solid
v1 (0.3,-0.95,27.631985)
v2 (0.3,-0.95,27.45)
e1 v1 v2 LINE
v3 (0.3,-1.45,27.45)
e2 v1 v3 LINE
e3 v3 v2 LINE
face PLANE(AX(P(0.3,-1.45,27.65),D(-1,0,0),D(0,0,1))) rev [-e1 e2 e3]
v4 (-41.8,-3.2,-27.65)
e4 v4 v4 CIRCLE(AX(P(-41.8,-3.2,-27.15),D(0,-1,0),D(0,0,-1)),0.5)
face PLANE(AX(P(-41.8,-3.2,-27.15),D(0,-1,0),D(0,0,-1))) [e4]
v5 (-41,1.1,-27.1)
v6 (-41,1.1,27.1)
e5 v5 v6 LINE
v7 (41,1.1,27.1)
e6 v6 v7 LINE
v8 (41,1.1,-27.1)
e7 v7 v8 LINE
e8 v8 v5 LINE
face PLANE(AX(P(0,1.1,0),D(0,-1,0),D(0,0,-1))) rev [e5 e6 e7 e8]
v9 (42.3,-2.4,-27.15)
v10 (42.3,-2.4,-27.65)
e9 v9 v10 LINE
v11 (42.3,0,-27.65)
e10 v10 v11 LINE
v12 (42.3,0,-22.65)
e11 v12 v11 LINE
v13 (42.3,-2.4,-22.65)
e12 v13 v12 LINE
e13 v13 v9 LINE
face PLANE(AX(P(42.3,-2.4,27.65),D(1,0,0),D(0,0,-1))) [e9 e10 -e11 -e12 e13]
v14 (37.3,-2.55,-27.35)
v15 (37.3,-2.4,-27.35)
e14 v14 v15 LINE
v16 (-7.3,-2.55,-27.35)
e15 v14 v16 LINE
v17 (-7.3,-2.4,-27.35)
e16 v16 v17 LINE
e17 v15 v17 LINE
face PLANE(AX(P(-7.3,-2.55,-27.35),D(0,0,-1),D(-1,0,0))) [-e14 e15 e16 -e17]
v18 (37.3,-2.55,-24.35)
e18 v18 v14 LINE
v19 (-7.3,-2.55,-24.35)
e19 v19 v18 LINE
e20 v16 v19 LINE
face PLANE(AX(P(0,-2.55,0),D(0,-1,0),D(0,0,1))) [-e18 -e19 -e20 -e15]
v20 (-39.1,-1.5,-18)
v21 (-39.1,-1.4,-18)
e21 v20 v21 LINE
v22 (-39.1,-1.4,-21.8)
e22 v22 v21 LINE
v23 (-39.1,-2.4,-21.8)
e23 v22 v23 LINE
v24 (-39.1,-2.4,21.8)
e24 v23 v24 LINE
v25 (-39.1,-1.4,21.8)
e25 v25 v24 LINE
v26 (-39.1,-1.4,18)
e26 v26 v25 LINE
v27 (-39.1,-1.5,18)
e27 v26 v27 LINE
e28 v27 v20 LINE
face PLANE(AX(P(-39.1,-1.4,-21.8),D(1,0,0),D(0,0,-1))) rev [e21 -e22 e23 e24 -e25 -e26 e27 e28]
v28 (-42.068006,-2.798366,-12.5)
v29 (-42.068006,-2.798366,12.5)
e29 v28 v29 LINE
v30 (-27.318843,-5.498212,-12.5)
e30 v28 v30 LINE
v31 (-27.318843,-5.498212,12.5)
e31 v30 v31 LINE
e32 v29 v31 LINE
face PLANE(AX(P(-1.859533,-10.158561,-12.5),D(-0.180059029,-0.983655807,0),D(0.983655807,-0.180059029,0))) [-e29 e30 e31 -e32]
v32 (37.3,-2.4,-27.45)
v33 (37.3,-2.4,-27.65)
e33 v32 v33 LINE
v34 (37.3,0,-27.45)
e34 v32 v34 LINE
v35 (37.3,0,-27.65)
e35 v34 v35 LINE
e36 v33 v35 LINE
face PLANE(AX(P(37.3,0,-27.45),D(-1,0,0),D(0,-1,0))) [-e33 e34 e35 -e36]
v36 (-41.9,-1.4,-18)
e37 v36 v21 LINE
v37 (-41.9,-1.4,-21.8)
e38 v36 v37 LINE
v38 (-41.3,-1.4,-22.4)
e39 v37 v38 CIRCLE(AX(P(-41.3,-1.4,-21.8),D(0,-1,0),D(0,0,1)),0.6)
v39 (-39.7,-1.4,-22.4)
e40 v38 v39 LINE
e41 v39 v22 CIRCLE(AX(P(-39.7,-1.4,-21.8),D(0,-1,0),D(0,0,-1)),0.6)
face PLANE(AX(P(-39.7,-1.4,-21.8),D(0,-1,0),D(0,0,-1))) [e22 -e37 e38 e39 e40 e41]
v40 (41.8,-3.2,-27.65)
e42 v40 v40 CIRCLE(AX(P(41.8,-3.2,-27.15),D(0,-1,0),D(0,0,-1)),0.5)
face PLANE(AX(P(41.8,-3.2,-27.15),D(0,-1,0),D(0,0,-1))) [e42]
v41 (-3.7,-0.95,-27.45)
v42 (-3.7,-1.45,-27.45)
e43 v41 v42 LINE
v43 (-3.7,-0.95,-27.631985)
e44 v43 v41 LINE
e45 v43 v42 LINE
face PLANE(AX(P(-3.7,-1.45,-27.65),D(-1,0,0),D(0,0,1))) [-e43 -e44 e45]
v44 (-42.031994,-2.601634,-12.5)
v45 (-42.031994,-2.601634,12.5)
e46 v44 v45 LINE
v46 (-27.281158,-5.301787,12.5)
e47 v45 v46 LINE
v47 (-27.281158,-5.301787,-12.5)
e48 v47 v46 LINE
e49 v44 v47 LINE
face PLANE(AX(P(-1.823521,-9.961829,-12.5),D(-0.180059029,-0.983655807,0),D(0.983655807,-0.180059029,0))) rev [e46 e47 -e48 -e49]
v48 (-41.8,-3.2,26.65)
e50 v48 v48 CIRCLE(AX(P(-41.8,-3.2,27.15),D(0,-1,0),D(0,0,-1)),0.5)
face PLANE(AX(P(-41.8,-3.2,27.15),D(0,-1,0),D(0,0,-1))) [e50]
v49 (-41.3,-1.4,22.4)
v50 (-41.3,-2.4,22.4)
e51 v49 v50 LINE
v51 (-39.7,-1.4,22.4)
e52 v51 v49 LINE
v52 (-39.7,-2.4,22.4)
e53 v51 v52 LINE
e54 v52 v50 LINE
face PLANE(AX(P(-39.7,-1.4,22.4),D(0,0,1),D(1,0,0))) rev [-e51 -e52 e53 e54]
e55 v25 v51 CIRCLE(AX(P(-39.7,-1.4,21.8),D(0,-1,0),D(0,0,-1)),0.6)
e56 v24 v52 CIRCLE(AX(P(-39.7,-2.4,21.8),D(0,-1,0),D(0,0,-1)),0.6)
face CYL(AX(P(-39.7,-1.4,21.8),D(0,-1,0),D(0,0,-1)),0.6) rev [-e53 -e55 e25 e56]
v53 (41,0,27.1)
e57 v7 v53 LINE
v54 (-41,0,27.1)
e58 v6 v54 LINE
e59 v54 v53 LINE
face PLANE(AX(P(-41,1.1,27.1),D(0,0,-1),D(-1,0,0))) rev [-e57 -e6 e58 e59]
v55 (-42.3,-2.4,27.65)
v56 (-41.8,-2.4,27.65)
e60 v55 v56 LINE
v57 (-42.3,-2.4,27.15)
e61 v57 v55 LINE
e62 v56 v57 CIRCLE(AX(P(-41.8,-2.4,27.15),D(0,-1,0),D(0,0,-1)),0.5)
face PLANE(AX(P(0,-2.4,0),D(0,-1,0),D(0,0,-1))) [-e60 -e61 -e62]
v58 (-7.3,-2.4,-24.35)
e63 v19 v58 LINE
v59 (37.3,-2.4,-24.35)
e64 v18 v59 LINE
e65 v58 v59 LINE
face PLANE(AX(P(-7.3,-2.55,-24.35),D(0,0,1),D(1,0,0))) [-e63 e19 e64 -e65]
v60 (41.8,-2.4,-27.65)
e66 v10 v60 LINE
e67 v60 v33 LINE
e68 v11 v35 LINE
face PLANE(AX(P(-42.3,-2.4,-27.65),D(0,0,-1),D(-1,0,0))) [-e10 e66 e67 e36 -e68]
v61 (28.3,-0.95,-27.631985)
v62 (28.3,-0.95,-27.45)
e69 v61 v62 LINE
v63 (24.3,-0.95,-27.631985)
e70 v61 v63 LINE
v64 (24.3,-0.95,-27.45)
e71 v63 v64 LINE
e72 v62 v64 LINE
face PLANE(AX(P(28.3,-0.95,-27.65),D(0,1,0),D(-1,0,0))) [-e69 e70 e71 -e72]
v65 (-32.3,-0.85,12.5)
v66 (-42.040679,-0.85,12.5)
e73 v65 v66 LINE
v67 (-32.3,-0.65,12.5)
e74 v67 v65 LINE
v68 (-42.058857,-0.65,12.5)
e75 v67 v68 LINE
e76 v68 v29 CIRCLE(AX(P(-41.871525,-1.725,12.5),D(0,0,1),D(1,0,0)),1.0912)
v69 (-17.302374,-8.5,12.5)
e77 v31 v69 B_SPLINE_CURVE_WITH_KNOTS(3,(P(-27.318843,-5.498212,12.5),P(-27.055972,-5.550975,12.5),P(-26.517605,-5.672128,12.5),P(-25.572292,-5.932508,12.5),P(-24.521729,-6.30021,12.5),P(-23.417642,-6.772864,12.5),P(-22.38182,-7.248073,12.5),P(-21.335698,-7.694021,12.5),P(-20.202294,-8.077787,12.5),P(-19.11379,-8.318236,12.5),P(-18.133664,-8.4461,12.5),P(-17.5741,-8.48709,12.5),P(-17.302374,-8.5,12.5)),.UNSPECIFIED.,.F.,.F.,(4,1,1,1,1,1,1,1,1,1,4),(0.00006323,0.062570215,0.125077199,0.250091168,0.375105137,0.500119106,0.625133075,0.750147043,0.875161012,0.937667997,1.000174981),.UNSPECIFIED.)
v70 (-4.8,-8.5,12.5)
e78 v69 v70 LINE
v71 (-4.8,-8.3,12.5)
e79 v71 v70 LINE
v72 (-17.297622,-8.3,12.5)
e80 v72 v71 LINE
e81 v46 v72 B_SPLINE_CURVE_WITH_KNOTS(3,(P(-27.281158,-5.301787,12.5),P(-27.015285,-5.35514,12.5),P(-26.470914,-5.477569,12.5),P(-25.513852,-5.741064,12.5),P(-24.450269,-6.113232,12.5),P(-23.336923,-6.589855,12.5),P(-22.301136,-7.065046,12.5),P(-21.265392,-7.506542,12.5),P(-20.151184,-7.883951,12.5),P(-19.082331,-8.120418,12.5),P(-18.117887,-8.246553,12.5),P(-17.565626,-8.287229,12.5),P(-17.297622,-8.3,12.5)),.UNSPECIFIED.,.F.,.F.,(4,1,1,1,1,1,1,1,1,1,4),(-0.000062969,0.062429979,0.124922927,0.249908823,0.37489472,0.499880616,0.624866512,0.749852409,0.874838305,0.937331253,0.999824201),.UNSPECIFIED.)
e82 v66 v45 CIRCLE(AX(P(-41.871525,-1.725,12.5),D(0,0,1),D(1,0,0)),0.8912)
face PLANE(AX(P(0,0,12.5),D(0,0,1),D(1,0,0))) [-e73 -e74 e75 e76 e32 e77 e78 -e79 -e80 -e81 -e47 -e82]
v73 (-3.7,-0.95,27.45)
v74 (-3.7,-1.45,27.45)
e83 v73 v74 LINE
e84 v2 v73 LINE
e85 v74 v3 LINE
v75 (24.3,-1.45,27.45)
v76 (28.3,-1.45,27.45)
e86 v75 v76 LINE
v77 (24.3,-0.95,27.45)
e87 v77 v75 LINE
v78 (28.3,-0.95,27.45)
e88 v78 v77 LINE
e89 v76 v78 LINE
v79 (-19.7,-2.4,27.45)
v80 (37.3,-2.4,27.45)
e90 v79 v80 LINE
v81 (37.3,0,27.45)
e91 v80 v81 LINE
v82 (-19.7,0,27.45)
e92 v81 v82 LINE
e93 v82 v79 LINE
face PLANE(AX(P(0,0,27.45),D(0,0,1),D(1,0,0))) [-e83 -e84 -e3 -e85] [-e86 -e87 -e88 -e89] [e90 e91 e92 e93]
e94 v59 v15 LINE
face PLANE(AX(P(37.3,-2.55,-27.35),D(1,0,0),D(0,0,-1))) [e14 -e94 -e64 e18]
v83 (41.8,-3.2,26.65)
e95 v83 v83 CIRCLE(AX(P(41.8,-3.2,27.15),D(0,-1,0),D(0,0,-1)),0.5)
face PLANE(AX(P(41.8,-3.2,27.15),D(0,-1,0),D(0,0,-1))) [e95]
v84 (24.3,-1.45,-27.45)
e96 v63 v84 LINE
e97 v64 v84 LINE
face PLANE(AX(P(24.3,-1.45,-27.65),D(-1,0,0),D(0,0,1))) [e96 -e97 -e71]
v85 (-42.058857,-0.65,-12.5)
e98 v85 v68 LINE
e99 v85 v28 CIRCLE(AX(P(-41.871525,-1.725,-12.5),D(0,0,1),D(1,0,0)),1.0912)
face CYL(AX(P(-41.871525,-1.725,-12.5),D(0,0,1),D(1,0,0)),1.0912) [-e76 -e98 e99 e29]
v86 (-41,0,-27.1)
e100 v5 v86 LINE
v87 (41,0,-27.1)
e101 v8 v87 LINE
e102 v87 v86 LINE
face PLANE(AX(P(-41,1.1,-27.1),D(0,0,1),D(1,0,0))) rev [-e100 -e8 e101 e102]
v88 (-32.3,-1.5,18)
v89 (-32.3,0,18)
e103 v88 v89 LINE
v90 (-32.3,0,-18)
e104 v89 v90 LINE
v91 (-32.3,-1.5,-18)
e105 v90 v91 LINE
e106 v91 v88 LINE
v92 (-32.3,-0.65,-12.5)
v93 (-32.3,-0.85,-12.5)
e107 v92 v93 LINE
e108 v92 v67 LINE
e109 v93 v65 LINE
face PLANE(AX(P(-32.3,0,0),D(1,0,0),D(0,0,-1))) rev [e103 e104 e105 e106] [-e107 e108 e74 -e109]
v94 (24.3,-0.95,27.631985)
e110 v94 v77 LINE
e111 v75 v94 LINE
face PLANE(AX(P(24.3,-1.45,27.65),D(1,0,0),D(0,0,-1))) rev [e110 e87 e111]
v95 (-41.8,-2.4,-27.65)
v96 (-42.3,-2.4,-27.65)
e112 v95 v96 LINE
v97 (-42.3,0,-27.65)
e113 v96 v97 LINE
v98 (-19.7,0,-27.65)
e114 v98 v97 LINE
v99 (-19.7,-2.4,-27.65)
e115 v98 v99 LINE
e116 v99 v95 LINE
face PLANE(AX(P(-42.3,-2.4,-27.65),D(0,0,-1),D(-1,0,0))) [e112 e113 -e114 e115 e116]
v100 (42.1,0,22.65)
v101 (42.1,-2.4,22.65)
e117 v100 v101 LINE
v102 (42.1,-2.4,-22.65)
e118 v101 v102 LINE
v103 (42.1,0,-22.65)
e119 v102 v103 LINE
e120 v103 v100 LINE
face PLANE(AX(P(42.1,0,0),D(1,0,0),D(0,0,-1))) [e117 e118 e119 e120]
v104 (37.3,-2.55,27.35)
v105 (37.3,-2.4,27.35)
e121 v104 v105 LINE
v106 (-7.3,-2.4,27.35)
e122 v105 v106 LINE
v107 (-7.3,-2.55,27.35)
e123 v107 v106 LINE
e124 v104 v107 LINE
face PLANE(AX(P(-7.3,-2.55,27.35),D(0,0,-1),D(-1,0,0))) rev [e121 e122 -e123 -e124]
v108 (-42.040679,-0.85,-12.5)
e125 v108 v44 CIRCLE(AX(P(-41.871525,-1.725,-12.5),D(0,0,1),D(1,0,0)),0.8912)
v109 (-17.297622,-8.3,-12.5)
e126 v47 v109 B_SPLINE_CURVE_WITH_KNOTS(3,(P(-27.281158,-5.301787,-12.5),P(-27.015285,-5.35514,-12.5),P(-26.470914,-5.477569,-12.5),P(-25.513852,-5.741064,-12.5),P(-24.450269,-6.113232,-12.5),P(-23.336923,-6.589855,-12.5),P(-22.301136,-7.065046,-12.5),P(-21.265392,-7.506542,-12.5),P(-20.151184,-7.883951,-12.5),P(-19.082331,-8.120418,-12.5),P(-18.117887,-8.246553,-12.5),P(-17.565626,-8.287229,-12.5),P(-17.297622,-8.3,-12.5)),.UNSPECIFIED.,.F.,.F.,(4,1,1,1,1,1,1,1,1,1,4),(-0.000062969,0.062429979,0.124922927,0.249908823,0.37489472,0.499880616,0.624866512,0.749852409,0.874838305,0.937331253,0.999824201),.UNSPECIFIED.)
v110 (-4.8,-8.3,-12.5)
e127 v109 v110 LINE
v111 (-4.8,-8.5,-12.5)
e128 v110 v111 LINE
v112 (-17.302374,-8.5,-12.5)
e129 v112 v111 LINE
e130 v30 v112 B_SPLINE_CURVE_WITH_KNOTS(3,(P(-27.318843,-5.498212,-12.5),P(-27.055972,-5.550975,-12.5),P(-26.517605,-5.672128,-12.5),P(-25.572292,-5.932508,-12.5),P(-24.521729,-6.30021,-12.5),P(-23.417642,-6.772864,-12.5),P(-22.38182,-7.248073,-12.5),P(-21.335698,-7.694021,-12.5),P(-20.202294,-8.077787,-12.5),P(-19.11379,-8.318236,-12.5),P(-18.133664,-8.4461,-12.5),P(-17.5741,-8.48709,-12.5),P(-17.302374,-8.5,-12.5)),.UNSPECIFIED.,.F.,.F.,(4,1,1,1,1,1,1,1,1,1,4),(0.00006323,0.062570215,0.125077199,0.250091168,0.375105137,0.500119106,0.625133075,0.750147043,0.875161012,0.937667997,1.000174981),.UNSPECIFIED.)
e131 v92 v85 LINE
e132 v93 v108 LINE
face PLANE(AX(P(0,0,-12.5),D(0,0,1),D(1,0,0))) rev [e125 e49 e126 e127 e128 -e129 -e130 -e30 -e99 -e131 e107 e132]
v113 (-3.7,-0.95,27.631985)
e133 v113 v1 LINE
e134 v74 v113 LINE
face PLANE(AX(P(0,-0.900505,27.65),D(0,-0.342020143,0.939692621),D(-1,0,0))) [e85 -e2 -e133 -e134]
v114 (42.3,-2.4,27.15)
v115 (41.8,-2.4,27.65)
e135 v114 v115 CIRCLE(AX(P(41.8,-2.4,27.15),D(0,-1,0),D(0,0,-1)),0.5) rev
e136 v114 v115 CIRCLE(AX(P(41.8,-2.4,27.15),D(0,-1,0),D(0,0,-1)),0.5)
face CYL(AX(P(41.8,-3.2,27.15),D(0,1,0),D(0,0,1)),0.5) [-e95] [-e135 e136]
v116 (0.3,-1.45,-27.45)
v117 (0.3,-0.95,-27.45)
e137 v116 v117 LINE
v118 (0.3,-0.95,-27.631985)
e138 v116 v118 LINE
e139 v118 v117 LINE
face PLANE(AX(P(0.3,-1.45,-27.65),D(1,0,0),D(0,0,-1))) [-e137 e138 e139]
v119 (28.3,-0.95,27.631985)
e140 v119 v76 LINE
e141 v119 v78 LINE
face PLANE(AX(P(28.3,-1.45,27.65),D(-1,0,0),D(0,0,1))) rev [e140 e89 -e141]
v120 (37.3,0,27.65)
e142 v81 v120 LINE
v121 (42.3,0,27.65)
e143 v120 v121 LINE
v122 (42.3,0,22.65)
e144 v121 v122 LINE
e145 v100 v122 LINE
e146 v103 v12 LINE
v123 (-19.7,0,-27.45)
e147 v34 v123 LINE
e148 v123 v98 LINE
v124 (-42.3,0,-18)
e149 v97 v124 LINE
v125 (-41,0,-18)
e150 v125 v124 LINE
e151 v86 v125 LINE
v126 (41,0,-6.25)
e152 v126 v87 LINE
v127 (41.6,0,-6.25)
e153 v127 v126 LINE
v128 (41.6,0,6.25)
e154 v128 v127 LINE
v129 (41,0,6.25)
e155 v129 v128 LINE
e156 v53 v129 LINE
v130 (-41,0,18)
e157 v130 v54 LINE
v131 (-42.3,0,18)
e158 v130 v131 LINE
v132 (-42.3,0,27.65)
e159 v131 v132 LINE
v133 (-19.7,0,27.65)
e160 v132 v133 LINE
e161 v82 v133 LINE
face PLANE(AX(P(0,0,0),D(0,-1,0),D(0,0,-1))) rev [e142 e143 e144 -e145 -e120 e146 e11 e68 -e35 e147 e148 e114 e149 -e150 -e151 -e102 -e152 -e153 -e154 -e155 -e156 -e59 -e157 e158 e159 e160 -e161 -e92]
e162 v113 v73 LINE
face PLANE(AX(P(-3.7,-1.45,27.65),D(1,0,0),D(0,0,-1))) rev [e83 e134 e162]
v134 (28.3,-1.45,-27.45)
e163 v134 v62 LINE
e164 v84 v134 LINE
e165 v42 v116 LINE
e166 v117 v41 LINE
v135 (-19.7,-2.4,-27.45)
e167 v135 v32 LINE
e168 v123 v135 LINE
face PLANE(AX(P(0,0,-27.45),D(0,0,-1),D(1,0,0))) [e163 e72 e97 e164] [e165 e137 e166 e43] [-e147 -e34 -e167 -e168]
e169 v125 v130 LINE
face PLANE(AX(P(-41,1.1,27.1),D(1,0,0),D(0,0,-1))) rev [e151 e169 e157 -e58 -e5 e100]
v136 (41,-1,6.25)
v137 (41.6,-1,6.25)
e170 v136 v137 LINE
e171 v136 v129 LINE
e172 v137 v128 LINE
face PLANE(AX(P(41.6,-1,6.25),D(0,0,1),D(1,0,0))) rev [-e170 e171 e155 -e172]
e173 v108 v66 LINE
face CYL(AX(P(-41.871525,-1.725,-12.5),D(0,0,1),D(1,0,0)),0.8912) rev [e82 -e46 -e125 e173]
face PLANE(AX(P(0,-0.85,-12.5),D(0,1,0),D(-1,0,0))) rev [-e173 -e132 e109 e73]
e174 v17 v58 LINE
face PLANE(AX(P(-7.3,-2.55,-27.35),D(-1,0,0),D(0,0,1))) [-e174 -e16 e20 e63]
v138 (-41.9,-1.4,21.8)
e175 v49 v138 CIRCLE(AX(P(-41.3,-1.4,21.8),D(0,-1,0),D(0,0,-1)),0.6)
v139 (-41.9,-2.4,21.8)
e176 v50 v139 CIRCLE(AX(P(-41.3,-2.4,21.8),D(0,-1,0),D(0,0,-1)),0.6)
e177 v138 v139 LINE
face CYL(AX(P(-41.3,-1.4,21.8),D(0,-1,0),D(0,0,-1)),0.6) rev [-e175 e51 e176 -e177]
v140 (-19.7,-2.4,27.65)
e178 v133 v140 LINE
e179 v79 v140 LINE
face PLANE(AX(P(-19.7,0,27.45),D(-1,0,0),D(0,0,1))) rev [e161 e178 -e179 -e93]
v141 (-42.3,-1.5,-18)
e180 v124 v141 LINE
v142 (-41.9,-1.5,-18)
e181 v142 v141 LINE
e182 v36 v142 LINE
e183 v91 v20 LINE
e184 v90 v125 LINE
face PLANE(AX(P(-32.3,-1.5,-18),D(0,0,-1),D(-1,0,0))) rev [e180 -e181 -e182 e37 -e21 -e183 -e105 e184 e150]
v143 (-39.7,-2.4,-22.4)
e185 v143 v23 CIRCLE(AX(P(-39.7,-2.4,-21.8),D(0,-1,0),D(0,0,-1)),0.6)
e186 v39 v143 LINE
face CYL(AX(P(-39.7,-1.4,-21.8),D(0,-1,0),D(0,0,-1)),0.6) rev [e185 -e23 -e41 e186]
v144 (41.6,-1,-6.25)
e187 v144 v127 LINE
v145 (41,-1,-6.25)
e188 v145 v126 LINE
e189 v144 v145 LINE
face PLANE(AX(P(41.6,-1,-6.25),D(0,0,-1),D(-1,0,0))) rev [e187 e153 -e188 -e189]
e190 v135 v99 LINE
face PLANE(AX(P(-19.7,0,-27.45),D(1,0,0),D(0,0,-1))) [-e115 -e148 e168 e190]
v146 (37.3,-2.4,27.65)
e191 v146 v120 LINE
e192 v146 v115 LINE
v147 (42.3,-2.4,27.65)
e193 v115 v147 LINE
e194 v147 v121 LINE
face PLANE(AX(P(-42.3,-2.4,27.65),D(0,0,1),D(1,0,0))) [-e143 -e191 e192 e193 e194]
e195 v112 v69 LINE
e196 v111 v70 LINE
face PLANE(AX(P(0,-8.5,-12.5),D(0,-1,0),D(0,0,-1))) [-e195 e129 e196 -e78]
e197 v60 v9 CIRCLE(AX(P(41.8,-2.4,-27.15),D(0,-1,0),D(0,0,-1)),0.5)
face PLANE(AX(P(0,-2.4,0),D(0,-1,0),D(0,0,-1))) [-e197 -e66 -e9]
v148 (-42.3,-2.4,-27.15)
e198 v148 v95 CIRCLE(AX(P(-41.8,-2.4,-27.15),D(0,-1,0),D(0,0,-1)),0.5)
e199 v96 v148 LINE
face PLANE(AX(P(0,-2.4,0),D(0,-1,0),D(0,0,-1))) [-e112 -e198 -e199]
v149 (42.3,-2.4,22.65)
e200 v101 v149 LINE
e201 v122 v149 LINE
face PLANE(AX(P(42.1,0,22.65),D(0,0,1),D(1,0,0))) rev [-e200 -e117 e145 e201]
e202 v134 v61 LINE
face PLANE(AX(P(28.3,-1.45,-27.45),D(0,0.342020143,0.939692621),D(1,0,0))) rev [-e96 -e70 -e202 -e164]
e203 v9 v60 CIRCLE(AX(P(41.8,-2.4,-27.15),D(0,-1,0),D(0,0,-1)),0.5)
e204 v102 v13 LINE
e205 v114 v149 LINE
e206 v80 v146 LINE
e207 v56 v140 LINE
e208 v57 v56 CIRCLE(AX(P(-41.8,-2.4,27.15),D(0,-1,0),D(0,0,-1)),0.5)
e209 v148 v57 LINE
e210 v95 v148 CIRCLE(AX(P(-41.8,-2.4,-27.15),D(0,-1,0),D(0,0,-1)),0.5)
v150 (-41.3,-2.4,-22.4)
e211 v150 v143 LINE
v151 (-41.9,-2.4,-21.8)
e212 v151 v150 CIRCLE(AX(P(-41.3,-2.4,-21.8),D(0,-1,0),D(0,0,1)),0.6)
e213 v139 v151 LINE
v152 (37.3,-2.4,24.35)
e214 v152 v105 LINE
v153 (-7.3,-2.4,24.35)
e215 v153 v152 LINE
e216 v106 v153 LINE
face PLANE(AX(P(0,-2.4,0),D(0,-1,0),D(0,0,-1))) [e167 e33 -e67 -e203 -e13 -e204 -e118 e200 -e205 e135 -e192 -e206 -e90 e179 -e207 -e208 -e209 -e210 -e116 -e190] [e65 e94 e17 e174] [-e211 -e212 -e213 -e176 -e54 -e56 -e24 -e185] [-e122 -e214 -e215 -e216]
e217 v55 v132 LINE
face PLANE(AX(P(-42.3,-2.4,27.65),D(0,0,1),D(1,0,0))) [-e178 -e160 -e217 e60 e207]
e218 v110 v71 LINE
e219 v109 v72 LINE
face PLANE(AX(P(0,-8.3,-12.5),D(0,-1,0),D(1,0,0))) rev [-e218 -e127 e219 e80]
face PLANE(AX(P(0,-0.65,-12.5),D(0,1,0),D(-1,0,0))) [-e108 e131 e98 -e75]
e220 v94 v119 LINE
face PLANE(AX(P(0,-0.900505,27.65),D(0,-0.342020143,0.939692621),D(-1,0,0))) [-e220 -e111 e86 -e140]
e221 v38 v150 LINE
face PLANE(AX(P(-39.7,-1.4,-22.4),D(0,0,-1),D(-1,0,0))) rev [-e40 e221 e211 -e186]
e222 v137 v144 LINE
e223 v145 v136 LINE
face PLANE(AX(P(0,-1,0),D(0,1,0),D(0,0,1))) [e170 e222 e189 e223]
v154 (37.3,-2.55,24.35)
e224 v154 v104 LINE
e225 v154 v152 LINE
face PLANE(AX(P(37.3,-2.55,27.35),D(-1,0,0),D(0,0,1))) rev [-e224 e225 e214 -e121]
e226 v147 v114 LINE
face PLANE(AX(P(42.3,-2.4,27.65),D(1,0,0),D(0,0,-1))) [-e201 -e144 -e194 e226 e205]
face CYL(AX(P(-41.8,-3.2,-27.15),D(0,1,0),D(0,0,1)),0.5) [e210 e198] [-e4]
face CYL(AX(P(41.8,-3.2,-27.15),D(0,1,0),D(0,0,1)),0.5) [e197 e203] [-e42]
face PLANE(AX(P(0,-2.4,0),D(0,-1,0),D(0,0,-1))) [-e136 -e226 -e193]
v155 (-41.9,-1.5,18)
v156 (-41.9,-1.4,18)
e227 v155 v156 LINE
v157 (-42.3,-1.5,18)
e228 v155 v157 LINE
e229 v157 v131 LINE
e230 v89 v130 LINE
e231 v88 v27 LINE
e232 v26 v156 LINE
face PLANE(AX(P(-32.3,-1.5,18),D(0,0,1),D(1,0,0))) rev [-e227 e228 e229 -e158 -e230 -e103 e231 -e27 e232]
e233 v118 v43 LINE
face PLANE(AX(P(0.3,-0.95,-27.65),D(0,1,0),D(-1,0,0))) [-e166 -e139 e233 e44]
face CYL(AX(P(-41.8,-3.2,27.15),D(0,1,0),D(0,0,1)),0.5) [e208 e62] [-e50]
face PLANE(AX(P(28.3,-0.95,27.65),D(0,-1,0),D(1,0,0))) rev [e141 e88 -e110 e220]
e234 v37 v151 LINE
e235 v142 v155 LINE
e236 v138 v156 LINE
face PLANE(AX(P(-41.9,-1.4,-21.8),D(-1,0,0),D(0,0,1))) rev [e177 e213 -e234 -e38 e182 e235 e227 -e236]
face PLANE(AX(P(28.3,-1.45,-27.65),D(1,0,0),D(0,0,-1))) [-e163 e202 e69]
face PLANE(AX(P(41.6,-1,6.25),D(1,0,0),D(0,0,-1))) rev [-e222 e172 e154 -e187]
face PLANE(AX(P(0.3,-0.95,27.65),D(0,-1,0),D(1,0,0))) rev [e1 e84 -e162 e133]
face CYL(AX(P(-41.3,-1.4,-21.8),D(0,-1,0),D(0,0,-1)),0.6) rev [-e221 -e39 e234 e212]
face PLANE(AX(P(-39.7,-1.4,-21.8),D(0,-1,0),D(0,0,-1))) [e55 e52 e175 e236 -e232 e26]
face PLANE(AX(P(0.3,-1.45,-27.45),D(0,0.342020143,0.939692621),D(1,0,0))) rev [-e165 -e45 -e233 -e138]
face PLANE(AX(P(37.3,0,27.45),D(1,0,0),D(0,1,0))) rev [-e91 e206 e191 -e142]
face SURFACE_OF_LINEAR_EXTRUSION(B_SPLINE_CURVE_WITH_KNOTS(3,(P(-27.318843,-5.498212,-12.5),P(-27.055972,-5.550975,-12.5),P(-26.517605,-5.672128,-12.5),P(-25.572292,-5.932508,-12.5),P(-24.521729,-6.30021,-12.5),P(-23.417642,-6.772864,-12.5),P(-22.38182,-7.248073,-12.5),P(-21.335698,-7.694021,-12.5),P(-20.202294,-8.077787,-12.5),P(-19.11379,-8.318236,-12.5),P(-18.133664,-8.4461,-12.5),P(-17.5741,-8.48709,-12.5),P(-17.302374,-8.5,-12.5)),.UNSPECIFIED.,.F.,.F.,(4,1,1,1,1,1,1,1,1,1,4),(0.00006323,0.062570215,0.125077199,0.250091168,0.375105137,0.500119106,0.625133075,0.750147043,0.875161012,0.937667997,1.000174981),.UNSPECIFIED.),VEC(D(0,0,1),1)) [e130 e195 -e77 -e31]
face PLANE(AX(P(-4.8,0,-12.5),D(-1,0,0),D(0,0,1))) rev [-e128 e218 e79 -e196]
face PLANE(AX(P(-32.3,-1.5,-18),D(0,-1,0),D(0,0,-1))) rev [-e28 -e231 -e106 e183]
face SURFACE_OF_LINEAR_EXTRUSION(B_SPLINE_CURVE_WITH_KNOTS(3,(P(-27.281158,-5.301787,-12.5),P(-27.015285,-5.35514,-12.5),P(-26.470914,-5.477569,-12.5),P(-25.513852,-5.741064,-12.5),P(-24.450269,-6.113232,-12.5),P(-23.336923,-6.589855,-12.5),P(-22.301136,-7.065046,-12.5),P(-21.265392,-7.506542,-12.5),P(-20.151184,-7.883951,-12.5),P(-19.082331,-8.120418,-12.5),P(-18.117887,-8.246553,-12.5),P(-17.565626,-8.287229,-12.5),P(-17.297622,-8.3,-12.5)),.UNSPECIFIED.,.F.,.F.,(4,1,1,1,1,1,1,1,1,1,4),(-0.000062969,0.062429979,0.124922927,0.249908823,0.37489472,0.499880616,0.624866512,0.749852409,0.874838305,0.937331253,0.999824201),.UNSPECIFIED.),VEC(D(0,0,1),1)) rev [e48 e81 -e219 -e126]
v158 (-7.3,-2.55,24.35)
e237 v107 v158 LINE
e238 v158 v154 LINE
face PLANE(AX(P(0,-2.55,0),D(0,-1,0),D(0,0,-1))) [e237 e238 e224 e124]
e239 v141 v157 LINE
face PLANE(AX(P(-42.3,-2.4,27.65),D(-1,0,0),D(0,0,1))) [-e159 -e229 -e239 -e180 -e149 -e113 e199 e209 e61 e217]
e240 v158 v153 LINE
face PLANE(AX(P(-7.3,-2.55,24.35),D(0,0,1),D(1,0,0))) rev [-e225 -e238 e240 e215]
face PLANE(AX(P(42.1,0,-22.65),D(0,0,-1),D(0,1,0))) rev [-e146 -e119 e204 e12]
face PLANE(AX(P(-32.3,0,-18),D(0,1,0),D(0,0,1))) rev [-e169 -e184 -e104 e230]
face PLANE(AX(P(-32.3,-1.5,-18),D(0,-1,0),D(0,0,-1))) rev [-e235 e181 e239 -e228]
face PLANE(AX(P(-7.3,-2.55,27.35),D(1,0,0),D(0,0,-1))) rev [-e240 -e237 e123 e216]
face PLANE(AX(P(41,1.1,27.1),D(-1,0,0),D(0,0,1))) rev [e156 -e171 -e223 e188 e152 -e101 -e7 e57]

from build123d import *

# Parameters (mm, degrees)
SKETCH1_W                  = 84.6
SKETCH1_H                  = 55.3
BOSS_EXTRUDE1_DEPTH        = 2.4
SKETCH2_W                  = 82
SKETCH2_H                  = 54.2
BOSS_EXTRUDE2_DEPTH        = 1.1
SKETCH3_R                  = 0.5
BOSS_EXTRUDE3_DEPTH        = 0.8
CUT_EXTRUDE1_DEPTH         = 1
SKETCH5_W                  = 57
SKETCH5_H                  = 2.4
CUT_EXTRUDE2_DEPTH         = 0.2
SKETCH6_W                  = 45.3
SKETCH6_H                  = 2.4
CUT_EXTRUDE3_DEPTH         = 0.2
SKETCH7_W                  = 44.6
SKETCH7_H                  = 3
BOSS_EXTRUDE4_DEPTH        = 0.15
SKETCH8_W                  = 0.6
SKETCH8_H                  = 12.5
CUT_EXTRUDE4_DEPTH         = 1
SKETCH9_W                  = 4
SKETCH9_H                  = 0.5
BOSS_EXTRUDE5_DEPTH        = 0.2
CHAMFER1_SIZE              = 0.2
CHAMFER1_SIZE_2            = 0.549495484
CHAMFER1_OF_MIRROR4_SIZE   = 0.2
CHAMFER1_OF_MIRROR4_SIZE_2 = 0.549495484
SKETCH10_W                 = 36
SKETCH10_H                 = 1.5
CUT_EXTRUDE5_DEPTH         = 10
BOSS_EXTRUDE7_DEPTH        = 12.5
BOSS_EXTRUDE7_DEPTH_BACK   = 12.5


with BuildPart() as part:
    # Sketch1 → Boss-Extrude1 (new body)
    with BuildSketch(Plane(origin=(0, 0, 0), x_dir=(1, 0, 0), z_dir=(0, 1, 0))):
        Rectangle(SKETCH1_W, SKETCH1_H)
    extrude(amount=-BOSS_EXTRUDE1_DEPTH)

    # Sketch2 → Boss-Extrude2 (add)
    with BuildSketch(Plane(origin=(0, 0, 0), x_dir=(1, 0, 0), z_dir=(0, 1, 0))):
        Rectangle(SKETCH2_W, SKETCH2_H)
    extrude(amount=BOSS_EXTRUDE2_DEPTH)

    # Sketch3 → Boss-Extrude3 (add)
    with BuildSketch(Plane.XZ.offset(2.4)):
        with Locations(Location((-41.8, 27.15, 0), (0, 0, 90))):
            Circle(SKETCH3_R)
        with Locations(Location((41.8, 27.15, 0), (0, 0, 90))):
            Circle(SKETCH3_R)
        with Locations(Location((41.8, -27.15, 0), (0, 0, 270))):
            Circle(SKETCH3_R)
        with Locations(Location((-41.8, -27.15, 0), (0, 0, 270))):
            Circle(SKETCH3_R)
    extrude(amount=BOSS_EXTRUDE3_DEPTH)

    # Sketch4 → Cut-Extrude1 (cut)
    with BuildSketch(Plane.XZ.offset(2.4)):
        with BuildLine():
            Line((-39.7, -22.4), (-41.3, -22.4))
            ThreePointArc((-41.3, -22.4), (-41.724264069, -22.224264069), (-41.9, -21.8))
            Line((-41.9, -21.8), (-41.9, 21.8))
            ThreePointArc((-41.9, 21.8), (-41.724264069, 22.224264069), (-41.3, 22.4))
            Line((-41.3, 22.4), (-39.7, 22.4))
            ThreePointArc((-39.7, 22.4), (-39.275735931, 22.224264069), (-39.1, 21.8))
            Line((-39.1, 21.8), (-39.1, -21.8))
            ThreePointArc((-39.1, -21.8), (-39.275735931, -22.224264069), (-39.7, -22.4))
        make_face()
    extrude(amount=-CUT_EXTRUDE1_DEPTH, mode=Mode.SUBTRACT)

    # Sketch5 → Cut-Extrude2 (cut)
    with BuildSketch(Plane.XY.offset(27.65)):
        with Locations((8.8, -1.2)):
            Rectangle(SKETCH5_W, SKETCH5_H)
    cut_extrude2 = extrude(amount=-CUT_EXTRUDE2_DEPTH, mode=Mode.SUBTRACT)

    # Mirror1: Cut-Extrude2 across plane
    add(cut_extrude2.mirror(Plane.XY), mode=Mode.SUBTRACT)

    # Sketch6 → Cut-Extrude3 (cut)
    with BuildSketch(Plane(origin=(42.3, 0, 0), x_dir=(0, 0, -1), z_dir=(1, 0, 0))):
        with Locations((0, -1.2)):
            Rectangle(SKETCH6_W, SKETCH6_H)
    extrude(amount=-CUT_EXTRUDE3_DEPTH, mode=Mode.SUBTRACT)

    # Sketch7 → Boss-Extrude4 (add)
    with BuildSketch(Plane.XZ.offset(2.4)):
        with Locations((15, 25.85)):
            Rectangle(SKETCH7_W, SKETCH7_H)
    boss_extrude4 = extrude(amount=BOSS_EXTRUDE4_DEPTH)

    # Mirror2: Boss-Extrude4 across plane
    add(boss_extrude4.mirror(Plane.XY))

    # Sketch8 → Cut-Extrude4 (cut)
    with BuildSketch(Plane(origin=(0, 0, 0), x_dir=(1, 0, 0), z_dir=(0, 1, 0))):
        with Locations((41.3, 0)):
            Rectangle(SKETCH8_W, SKETCH8_H)
    extrude(amount=-CUT_EXTRUDE4_DEPTH, mode=Mode.SUBTRACT)

    # Sketch9 → Boss-Extrude5 (add)
    with BuildSketch(Plane.XY.offset(27.45)):
        with Locations((-1.7, -1.2)):
            Rectangle(SKETCH9_W, SKETCH9_H)
        with Locations((26.3, -1.2)):
            Rectangle(SKETCH9_W, SKETCH9_H)
    boss_extrude5 = extrude(amount=BOSS_EXTRUDE5_DEPTH)

    # Chamfer1
    # the kernel refuses this chamfer: 0.549495484, 0.2 mm, written as the material it takes off along each edge
    with BuildSketch(Plane(origin=(29.72549829, -1.45, 27.65), x_dir=(0, -0.0990409022520511, -0.9950833631817485), z_dir=(-1, 0, 0))) as chamfer1_piece_1_section:
        Polygon((CHAMFER1_SIZE * 0.995083363182, -CHAMFER1_SIZE * 0.0990409022521), (-CHAMFER1_SIZE_2 * 0.0990409022324, -CHAMFER1_SIZE_2 * 0.995083362984), (0, 0), align=None)
    chamfer1_piece_1 = extrude(amount=6.85099658, mode=Mode.PRIVATE)
    chamfer1_piece_1 = split(chamfer1_piece_1, bisect_by=Plane(origin=(26.3, -1.261493049, 27.45), z_dir=(0, 0, 1)), keep=Keep.TOP, mode=Mode.PRIVATE)
    add(chamfer1_piece_1, mode=Mode.SUBTRACT)
    with BuildSketch(Plane(origin=(1.72549829, -1.45, 27.65), x_dir=(0, -0.0990409022520511, -0.9950833631817485), z_dir=(-1, 0, 0))) as chamfer1_piece_2_section:
        Polygon((CHAMFER1_SIZE * 0.995083363182, -CHAMFER1_SIZE * 0.0990409022521), (-CHAMFER1_SIZE_2 * 0.0990409022324, -CHAMFER1_SIZE_2 * 0.995083362984), (0, 0), align=None)
    chamfer1_piece_2 = extrude(amount=6.85099658, mode=Mode.PRIVATE)
    chamfer1_piece_2 = split(chamfer1_piece_2, bisect_by=Plane(origin=(-1.7, -1.261493049, 27.45), z_dir=(0, 0, 1)), keep=Keep.TOP, mode=Mode.PRIVATE)
    add(chamfer1_piece_2, mode=Mode.SUBTRACT)

    # Mirror4: Boss-Extrude5 across plane
    add(boss_extrude5.mirror(Plane.XY))

    # Chamfer1 of Mirror4
    # the kernel refuses this chamfer: 0.549495484, 0.2 mm, written as the material it takes off along each edge
    with BuildSketch(Plane(origin=(29.72549829, -1.45, -27.65), x_dir=(0, -0.0990409022520511, 0.9950833631817485), z_dir=(-1, 0, 0))) as chamfer1_of_mirror4_piece_1_section:
        Polygon((CHAMFER1_OF_MIRROR4_SIZE * 0.995083363182, CHAMFER1_OF_MIRROR4_SIZE * 0.0990409022521), (-CHAMFER1_OF_MIRROR4_SIZE_2 * 0.0990409022324, CHAMFER1_OF_MIRROR4_SIZE_2 * 0.995083362984), (0, 0), align=None)
    chamfer1_of_mirror4_piece_1 = extrude(amount=6.85099658, mode=Mode.PRIVATE)
    chamfer1_of_mirror4_piece_1 = split(chamfer1_of_mirror4_piece_1, bisect_by=Plane(origin=(26.3, -1.261493049, -27.45), z_dir=(0, 0, -1)), keep=Keep.TOP, mode=Mode.PRIVATE)
    add(chamfer1_of_mirror4_piece_1, mode=Mode.SUBTRACT)
    with BuildSketch(Plane(origin=(1.72549829, -1.45, -27.65), x_dir=(0, -0.0990409022520511, 0.9950833631817485), z_dir=(-1, 0, 0))) as chamfer1_of_mirror4_piece_2_section:
        Polygon((CHAMFER1_OF_MIRROR4_SIZE * 0.995083363182, CHAMFER1_OF_MIRROR4_SIZE * 0.0990409022521), (-CHAMFER1_OF_MIRROR4_SIZE_2 * 0.0990409022324, CHAMFER1_OF_MIRROR4_SIZE_2 * 0.995083362984), (0, 0), align=None)
    chamfer1_of_mirror4_piece_2 = extrude(amount=6.85099658, mode=Mode.PRIVATE)
    chamfer1_of_mirror4_piece_2 = split(chamfer1_of_mirror4_piece_2, bisect_by=Plane(origin=(-1.7, -1.261493049, -27.45), z_dir=(0, 0, -1)), keep=Keep.TOP, mode=Mode.PRIVATE)
    add(chamfer1_of_mirror4_piece_2, mode=Mode.SUBTRACT)

    # Sketch10 → Cut-Extrude5 (cut)
    with BuildSketch(Plane.ZY.offset(42.3)):
        with Locations((0, -0.75)):
            Rectangle(SKETCH10_W, SKETCH10_H)
    extrude(amount=-CUT_EXTRUDE5_DEPTH, mode=Mode.SUBTRACT)

    # Sketch13 → Boss-Extrude7 (add, two sides: drawn at the far end of the back side and taken through both)
    with BuildSketch(Plane.XY.offset(-BOSS_EXTRUDE7_DEPTH_BACK)):
        with BuildLine():
            Line((-42.05, -0.75), (-32.3, -0.75))
            Line((-32.3, -0.75), (-32.3, -0.65))
            Line((-32.3, -0.65), (-42.058857344, -0.65))
            ThreePointArc((-42.058857344, -0.65), (-42.962715901, -1.720353295), (-42.068005903, -2.798365581))
            Line((-42.068005903, -2.798365581), (-27.318842711, -5.498212402))
            add(Edge.make_bspline(
                [(-27.318842711, -5.498212402), (-27.055971917, -5.550974674), (-26.517605359, -5.672128419), (-25.572291866, -5.932507667), (-24.521729024, -6.300209586), (-23.417642306, -6.772863788), (-22.38181971, -7.248072884), (-21.335698344, -7.694021321), (-20.202294115, -8.077787346), (-19.113789609, -8.318235721), (-18.133663704, -8.446100314), (-17.574099695, -8.487090287), (-17.302374167, -8.5)],
                knots=[6.323e-05, 6.323e-05, 6.323e-05, 6.323e-05, 0.062570215, 0.125077199, 0.250091168, 0.375105137, 0.500119106, 0.625133075, 0.750147043, 0.875161012, 0.937667997, 1.000174981, 1.000174981, 1.000174981, 1.000174981], degree=3))
            Line((-17.302374167, -8.5), (-4.8, -8.5))
            Line((-4.8, -8.5), (-4.8, -8.4))
            Line((-4.8, -8.4), (-17.3, -8.4))
            add(Edge.make_bspline(
                [(-27.3, -5.4), (-22.890715179, -6.284799168), (-21.81761674, -8.185367475), (-17.3, -8.4)],
                knots=[0, 0, 0, 0, 1, 1, 1, 1], degree=3))
            Line((-27.3, -5.4), (-42.05, -2.7))
            ThreePointArc((-42.05, -2.7), (-42.862725794, -1.725), (-42.05, -0.75))
        make_face()
        with BuildLine():
            Line((-32.3, -0.85), (-32.3, -0.75))
            Line((-32.3, -0.75), (-42.05, -0.75))
            ThreePointArc((-42.05, -0.75), (-42.862725794, -1.725), (-42.05, -2.7))
            Line((-42.05, -2.7), (-27.3, -5.4))
            add(Edge.make_bspline(
                [(-27.3, -5.4), (-22.890715179, -6.284799168), (-21.81761674, -8.185367475), (-17.3, -8.4)],
                knots=[0, 0, 0, 0, 1, 1, 1, 1], degree=3))
            Line((-17.3, -8.4), (-4.8, -8.4))
            Line((-4.8, -8.4), (-4.8, -8.3))
            Line((-4.8, -8.3), (-17.297622246, -8.3))
            add(Edge.make_bspline(
                [(-27.281158431, -5.301787389), (-27.015284827, -5.35513952), (-26.470914345, -5.477568661), (-25.513851699, -5.741064097), (-24.450268814, -6.113231913), (-23.336923139, -6.589854571), (-22.30113605, -7.06504573), (-21.26539226, -7.506542017), (-20.151183505, -7.883950719), (-19.082330822, -8.120417996), (-18.117886975, -8.246552851), (-17.565625944, -8.287228528), (-17.297622246, -8.3)],
                knots=[-6.2969e-05, -6.2969e-05, -6.2969e-05, -6.2969e-05, 0.062429979, 0.124922927, 0.249908823, 0.37489472, 0.499880616, 0.624866512, 0.749852409, 0.874838305, 0.937331253, 0.999824201, 0.999824201, 0.999824201, 0.999824201], degree=3))
            Line((-27.281158431, -5.301787389), (-42.031994097, -2.601634419))
            ThreePointArc((-42.031994097, -2.601634419), (-42.762714839, -1.729418922), (-42.040679496, -0.85))
            Line((-42.040679496, -0.85), (-32.3, -0.85))
        make_face()
    extrude(amount=BOSS_EXTRUDE7_DEPTH + BOSS_EXTRUDE7_DEPTH_BACK)


solid = part.part
